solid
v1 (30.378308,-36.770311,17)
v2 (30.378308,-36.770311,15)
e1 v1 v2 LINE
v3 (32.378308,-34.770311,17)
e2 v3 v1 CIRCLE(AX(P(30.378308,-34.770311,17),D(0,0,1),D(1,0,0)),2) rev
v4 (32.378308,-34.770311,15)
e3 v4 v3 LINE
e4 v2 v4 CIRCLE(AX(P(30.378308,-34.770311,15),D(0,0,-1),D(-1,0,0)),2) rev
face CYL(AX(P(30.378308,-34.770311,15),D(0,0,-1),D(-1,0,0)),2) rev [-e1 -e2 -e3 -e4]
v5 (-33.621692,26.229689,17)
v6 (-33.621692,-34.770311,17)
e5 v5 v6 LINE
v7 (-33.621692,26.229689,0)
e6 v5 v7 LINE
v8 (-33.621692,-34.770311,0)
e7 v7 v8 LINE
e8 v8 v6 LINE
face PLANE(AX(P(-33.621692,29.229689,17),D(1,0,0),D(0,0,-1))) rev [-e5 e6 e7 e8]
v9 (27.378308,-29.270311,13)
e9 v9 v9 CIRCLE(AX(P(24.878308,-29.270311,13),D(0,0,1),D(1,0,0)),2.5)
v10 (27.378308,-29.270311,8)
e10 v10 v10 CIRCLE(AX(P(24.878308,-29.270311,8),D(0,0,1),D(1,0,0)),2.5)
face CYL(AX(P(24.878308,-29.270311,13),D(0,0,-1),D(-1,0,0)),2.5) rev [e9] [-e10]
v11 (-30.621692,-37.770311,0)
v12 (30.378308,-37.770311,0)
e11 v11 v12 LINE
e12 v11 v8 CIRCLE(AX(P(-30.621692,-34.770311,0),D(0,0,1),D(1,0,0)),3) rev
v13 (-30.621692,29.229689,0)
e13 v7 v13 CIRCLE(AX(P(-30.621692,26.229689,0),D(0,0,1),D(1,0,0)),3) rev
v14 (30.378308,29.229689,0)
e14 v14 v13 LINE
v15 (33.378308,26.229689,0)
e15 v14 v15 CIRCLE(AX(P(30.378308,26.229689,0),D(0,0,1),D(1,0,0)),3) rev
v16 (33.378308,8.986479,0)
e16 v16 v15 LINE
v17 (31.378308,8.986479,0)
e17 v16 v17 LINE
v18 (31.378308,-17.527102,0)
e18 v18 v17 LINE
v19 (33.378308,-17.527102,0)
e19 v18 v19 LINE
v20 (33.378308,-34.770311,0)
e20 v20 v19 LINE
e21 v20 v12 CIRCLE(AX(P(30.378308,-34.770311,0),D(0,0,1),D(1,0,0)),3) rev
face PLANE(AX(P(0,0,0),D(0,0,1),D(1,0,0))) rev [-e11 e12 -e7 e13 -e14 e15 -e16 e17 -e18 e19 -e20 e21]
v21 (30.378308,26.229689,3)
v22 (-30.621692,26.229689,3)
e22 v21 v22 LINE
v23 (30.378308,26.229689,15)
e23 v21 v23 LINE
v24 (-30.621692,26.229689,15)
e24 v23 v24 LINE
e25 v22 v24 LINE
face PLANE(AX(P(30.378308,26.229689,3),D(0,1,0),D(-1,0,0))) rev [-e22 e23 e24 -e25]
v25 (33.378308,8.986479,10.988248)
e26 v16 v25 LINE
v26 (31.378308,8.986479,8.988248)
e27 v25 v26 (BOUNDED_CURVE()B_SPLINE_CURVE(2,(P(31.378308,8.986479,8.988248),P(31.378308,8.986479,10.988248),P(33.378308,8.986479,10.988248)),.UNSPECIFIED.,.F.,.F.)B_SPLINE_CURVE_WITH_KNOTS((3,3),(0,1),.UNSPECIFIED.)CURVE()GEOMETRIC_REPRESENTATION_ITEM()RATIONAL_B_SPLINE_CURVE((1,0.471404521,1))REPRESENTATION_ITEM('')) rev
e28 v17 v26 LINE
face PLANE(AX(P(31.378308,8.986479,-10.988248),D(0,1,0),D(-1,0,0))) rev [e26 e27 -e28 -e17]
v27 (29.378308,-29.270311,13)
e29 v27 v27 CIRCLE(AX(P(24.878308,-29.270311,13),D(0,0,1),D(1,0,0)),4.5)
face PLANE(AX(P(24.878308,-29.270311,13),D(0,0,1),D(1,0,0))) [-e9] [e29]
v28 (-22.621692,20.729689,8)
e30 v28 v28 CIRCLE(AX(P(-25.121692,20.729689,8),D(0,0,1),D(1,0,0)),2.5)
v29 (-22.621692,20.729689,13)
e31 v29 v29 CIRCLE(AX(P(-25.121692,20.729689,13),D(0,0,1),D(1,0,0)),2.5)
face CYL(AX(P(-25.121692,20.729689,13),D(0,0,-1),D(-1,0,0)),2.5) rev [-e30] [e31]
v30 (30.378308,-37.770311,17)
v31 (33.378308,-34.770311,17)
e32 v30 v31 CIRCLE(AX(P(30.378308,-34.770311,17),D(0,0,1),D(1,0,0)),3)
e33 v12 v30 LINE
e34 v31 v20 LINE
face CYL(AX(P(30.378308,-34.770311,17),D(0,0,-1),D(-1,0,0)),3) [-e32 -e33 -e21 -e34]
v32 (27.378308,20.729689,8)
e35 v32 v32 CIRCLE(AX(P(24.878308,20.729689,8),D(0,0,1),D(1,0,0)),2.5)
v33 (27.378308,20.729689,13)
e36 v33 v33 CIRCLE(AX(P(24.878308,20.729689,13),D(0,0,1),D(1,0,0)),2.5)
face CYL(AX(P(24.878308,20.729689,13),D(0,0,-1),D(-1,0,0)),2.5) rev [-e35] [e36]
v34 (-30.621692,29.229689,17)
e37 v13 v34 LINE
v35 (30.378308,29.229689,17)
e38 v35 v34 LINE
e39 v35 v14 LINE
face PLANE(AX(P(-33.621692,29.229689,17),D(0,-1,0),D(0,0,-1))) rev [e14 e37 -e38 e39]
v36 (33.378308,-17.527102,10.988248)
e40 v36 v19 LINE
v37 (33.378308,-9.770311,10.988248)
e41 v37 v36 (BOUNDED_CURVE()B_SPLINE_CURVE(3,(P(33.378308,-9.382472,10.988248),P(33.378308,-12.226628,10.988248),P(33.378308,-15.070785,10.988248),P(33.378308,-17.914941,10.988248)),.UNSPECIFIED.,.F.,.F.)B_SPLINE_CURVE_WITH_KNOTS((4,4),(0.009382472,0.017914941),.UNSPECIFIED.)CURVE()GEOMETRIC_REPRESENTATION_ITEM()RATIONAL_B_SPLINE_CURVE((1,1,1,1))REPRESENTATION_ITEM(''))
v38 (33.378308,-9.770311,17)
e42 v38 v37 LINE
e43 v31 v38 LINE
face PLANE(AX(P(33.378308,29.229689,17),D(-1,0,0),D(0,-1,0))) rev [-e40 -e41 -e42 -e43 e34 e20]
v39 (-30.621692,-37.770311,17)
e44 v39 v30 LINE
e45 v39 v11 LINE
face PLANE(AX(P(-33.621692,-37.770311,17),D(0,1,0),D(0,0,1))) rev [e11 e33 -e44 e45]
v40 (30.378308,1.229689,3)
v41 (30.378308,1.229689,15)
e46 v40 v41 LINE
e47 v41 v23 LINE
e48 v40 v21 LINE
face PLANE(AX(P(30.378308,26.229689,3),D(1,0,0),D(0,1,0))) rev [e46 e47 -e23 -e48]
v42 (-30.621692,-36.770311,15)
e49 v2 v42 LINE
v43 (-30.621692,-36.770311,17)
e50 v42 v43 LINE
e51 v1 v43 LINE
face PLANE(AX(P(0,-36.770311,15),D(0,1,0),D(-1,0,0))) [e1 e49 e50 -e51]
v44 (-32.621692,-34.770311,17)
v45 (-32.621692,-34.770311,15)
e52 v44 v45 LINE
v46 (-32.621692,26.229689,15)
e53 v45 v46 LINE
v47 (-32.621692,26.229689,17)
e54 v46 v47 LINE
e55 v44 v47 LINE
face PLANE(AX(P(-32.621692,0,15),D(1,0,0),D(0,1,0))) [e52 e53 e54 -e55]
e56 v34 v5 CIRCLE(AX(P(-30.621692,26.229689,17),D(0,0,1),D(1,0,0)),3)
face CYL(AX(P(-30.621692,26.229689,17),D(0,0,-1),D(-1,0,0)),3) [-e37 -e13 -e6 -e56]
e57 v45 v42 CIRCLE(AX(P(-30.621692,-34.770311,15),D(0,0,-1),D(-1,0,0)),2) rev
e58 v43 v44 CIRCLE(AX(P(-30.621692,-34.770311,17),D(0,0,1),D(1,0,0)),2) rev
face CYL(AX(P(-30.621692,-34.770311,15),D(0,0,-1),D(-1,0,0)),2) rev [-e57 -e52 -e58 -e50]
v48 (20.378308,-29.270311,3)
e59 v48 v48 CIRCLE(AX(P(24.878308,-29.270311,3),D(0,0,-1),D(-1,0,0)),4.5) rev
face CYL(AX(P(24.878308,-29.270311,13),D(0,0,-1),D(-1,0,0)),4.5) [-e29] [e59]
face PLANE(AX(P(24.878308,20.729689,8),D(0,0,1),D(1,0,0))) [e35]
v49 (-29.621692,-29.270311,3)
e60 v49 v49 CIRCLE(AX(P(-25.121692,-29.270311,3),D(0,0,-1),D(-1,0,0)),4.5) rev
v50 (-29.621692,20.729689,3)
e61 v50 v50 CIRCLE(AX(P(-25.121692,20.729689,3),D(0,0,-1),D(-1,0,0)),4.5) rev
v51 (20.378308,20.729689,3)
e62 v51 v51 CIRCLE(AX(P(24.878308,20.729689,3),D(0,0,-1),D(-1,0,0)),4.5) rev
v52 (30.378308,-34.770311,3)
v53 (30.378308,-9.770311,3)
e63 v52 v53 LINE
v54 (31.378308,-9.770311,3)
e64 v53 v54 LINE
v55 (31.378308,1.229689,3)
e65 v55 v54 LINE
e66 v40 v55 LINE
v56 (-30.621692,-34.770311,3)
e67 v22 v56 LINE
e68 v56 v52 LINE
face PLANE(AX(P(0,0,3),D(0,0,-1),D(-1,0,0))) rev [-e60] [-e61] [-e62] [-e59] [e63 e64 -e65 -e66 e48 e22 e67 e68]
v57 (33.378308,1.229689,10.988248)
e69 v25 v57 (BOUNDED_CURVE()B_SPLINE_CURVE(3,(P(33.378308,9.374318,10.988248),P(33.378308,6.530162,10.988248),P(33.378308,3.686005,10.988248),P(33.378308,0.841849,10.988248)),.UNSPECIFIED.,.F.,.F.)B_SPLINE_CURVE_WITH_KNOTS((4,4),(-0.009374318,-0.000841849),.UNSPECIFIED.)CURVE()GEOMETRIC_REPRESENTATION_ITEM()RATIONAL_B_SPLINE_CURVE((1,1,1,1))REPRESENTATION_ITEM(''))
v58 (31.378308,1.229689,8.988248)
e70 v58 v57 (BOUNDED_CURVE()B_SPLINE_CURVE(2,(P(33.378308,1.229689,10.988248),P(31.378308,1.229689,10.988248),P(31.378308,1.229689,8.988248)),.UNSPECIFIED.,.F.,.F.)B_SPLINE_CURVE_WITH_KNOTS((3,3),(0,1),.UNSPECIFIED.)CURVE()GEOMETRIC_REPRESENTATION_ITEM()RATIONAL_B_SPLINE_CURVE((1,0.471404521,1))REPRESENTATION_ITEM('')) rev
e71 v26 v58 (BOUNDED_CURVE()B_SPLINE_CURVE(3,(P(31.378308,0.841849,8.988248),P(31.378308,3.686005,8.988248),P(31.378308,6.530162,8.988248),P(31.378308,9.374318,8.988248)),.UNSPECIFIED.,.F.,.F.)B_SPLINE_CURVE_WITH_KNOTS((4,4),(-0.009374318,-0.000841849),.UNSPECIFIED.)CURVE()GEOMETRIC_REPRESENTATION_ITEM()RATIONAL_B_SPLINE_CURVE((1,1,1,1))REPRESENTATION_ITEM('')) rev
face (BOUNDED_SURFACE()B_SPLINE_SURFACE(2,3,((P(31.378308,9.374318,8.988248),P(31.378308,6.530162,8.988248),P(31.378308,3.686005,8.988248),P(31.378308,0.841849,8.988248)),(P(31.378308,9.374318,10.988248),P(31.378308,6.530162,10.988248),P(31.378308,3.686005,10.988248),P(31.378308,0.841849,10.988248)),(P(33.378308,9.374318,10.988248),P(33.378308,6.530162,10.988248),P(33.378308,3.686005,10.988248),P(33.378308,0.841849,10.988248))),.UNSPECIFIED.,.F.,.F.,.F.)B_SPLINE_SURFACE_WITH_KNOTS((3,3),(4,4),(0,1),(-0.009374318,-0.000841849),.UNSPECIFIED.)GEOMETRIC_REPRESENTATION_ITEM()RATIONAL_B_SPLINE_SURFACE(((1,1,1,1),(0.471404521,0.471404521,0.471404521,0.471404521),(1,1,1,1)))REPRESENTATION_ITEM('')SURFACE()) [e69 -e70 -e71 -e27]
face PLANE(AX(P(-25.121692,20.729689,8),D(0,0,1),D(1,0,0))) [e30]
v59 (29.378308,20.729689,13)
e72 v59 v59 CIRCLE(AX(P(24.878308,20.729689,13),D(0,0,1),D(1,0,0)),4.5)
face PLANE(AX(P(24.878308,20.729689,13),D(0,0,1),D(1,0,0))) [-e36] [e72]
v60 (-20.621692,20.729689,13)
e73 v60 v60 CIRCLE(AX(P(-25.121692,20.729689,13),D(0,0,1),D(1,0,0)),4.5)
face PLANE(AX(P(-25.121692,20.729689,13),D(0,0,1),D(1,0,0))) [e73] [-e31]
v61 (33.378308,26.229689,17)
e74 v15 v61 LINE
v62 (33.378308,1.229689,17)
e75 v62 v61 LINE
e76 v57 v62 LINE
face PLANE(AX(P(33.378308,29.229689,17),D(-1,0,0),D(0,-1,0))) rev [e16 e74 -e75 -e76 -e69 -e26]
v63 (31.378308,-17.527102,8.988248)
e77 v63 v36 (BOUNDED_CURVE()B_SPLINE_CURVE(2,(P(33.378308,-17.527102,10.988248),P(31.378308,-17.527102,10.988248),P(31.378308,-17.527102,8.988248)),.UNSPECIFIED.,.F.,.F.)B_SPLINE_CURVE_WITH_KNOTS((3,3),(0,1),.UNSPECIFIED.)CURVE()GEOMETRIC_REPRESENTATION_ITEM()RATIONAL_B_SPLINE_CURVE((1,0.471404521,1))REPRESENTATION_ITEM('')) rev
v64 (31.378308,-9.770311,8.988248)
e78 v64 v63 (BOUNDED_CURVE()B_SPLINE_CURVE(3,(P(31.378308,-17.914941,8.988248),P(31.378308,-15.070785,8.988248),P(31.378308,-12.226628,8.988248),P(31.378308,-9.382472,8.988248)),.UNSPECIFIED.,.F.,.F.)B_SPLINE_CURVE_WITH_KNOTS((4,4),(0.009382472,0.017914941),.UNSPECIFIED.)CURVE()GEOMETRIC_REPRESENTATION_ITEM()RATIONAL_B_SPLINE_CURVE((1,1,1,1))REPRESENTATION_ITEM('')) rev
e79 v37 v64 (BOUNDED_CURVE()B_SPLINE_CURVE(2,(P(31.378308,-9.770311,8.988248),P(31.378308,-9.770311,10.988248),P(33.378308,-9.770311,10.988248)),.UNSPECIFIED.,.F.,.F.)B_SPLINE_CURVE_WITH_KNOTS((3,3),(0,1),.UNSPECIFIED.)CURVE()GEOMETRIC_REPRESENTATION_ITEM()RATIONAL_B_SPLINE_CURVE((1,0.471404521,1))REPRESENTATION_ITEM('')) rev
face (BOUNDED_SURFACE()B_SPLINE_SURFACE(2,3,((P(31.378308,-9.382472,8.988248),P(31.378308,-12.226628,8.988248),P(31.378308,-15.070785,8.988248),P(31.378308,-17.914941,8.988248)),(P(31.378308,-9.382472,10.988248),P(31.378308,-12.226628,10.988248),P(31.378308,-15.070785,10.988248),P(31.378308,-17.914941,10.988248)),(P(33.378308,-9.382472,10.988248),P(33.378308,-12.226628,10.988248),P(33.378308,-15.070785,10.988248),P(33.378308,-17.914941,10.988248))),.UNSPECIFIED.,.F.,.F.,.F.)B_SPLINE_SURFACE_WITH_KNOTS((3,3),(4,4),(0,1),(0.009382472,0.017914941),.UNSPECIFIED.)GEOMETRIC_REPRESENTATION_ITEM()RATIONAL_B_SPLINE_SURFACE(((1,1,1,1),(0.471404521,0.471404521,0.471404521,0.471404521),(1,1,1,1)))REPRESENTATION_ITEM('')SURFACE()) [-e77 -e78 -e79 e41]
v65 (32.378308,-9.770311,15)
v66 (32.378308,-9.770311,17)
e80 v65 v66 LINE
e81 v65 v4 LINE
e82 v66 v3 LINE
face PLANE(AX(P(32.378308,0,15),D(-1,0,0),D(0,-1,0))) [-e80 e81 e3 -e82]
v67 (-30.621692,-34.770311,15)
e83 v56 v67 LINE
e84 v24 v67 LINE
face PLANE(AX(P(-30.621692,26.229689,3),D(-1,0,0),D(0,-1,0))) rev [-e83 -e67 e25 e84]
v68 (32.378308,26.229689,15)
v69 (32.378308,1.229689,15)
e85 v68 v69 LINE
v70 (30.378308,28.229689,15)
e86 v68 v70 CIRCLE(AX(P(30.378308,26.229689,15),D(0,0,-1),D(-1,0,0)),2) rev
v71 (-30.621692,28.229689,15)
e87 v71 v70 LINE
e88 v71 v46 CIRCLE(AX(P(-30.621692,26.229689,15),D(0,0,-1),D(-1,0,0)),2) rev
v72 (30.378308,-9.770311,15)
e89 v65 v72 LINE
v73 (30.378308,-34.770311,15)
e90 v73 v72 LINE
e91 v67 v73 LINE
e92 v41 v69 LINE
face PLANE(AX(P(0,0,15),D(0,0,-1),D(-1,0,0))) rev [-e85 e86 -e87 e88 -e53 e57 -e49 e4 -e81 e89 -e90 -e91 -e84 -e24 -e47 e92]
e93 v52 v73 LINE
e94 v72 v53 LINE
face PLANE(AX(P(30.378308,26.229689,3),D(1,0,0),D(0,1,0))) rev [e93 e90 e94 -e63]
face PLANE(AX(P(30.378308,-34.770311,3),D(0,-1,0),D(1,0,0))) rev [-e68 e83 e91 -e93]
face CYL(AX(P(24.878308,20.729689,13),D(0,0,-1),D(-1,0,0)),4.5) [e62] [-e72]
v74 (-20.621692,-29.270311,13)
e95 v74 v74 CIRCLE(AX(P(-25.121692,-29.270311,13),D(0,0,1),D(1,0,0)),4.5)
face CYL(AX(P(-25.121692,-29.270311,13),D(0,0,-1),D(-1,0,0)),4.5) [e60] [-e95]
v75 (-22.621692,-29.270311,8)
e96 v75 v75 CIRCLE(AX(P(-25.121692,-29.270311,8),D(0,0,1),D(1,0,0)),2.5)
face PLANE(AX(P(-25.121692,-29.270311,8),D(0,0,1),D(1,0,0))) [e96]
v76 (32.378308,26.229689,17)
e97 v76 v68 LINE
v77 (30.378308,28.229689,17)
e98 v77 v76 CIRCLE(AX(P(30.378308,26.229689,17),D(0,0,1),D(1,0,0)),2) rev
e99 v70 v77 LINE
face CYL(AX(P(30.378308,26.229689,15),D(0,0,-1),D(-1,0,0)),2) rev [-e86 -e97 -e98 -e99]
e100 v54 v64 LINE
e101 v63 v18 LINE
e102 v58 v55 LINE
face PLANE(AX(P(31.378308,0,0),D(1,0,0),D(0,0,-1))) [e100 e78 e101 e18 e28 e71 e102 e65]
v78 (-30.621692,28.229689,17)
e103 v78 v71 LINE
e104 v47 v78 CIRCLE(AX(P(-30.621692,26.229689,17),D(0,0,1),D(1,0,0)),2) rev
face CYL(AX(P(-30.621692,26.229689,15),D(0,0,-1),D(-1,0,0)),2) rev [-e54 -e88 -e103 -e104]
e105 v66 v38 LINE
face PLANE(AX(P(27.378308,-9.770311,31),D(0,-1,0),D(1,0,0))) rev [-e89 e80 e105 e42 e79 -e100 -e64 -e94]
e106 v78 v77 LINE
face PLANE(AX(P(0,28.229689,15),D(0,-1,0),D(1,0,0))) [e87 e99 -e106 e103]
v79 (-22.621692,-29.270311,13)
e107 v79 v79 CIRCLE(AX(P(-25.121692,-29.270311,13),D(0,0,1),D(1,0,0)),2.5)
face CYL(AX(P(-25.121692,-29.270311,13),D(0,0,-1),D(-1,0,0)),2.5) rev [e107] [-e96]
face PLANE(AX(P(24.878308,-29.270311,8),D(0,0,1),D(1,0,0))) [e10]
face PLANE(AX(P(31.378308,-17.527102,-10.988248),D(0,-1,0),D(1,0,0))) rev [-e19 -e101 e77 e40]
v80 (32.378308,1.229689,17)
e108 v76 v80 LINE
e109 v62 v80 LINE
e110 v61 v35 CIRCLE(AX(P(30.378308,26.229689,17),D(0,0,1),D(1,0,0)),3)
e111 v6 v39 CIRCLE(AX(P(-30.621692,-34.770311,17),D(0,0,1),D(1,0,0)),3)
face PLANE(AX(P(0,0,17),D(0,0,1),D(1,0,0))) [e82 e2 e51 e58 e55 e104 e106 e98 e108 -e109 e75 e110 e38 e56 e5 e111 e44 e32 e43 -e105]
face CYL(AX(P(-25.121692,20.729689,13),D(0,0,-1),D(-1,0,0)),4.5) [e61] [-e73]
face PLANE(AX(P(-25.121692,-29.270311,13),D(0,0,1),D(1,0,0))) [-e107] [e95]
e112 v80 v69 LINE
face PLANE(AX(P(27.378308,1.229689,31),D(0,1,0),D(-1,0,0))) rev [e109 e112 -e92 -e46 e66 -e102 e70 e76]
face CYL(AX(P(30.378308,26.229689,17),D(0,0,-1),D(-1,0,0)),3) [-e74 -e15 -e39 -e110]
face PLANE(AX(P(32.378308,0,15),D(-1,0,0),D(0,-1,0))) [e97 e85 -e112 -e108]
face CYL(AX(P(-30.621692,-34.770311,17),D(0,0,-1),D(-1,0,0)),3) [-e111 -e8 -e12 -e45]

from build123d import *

# Parameters (mm, degrees)
SKETCH1_W           = 67
SKETCH1_H           = 67
BOSS_EXTRUDE1_DEPTH = 17
SKETCH2_W           = 61
SKETCH2_H           = 61
CUT_EXTRUDE1_DEPTH  = 14
CUT_EXTRUDE2_START  = 17
SKETCH3_W           = 65
SKETCH3_H           = 65
CUT_EXTRUDE2_DEPTH  = 2
FILLET1_R           = 3
FILLET3_R           = 2
FILLET4_R           = 2
FILLET5_R           = 2
FILLET6_R           = 2
FILLET7_R           = 3
FILLET8_R           = 3
FILLET9_R           = 3
SKETCH4_R           = 4.5
SKETCH4_R_2         = 2.5
BOSS_EXTRUDE2_DEPTH = 10
SKETCH5_R           = 2.5
BOSS_EXTRUDE3_DEPTH = 5
SKETCH6_W           = 28
SKETCH6_H           = 11
CUT_EXTRUDE3_DEPTH  = 6
SKETCH7_W           = 21.976496756
SKETCH7_H           = 26.513580245
CUT_EXTRUDE4_DEPTH  = 2
FILLET12_SIZE       = 2
FILLET13_SIZE       = 2


with BuildPart() as part:
    # Sketch1 → Boss-Extrude1 (new body)
    with BuildSketch(Plane.XY):
        with Locations((-0.121691543, -4.270311459)):
            Rectangle(SKETCH1_W, SKETCH1_H)
    extrude(amount=BOSS_EXTRUDE1_DEPTH)

    # Sketch2 → Cut-Extrude1 (cut)
    with BuildSketch(Plane.XY.offset(17)):
        with Locations((-0.121691543, -4.270311459)):
            Rectangle(SKETCH2_W, SKETCH2_H)
    extrude(amount=-CUT_EXTRUDE1_DEPTH, mode=Mode.SUBTRACT)

    # Sketch3 → Cut-Extrude2 (cut)
    with BuildSketch(Plane.XY.offset(CUT_EXTRUDE2_START)):
        with Locations((-0.121691543, -4.270311459)):
            Rectangle(SKETCH3_W, SKETCH3_H)
    extrude(amount=-CUT_EXTRUDE2_DEPTH, mode=Mode.SUBTRACT)

    # Fillet1
    fillet1_edges = [part.edges().sort_by_distance(p)[0] for p in [
        (-33.621691543, -37.770311459, 8.5),
    ]]
    fillet(fillet1_edges, radius=FILLET1_R)

    # Fillet3
    fillet3_edges = [part.edges().sort_by_distance(p)[0] for p in [
        (-32.621691543, -36.770311459, 16),
    ]]
    fillet(fillet3_edges, radius=FILLET3_R)

    # Fillet4
    fillet4_edges = [part.edges().sort_by_distance(p)[0] for p in [
        (-32.621691543, 28.229688541, 16),
    ]]
    fillet(fillet4_edges, radius=FILLET4_R)

    # Fillet5
    fillet5_edges = [part.edges().sort_by_distance(p)[0] for p in [
        (32.378308457, 28.229688541, 16),
    ]]
    fillet(fillet5_edges, radius=FILLET5_R)

    # Fillet6
    fillet6_edges = [part.edges().sort_by_distance(p)[0] for p in [
        (32.378308457, -36.770311459, 16),
    ]]
    fillet(fillet6_edges, radius=FILLET6_R)

    # Fillet7
    fillet7_edges = [part.edges().sort_by_distance(p)[0] for p in [
        (33.378308457, -37.770311459, 8.5),
    ]]
    fillet(fillet7_edges, radius=FILLET7_R)

    # Fillet8
    fillet8_edges = [part.edges().sort_by_distance(p)[0] for p in [
        (33.378308457, 29.229688541, 8.5),
    ]]
    fillet(fillet8_edges, radius=FILLET8_R)

    # Fillet9
    fillet9_edges = [part.edges().sort_by_distance(p)[0] for p in [
        (-33.621691543, 29.229688541, 8.5),
    ]]
    fillet(fillet9_edges, radius=FILLET9_R)

    # Sketch4 → Boss-Extrude2 (add)
    # profile 1 of 4: a face of its own
    with BuildSketch(Plane.XY.offset(3)):
        with Locations(Location((24.878308457, -29.270311459, 0), (0, 0, 180))):
            Circle(SKETCH4_R)
        with Locations((24.878308457, -29.270311459)):
            Circle(SKETCH4_R_2, mode=Mode.SUBTRACT)
    # profile 2 of 4: a face of its own
    with BuildSketch(Plane.XY.offset(3)):
        with Locations(Location((-25.121691543, -29.270311459, 0), (0, 0, 180))):
            Circle(SKETCH4_R)
        with Locations((-25.121691543, -29.270311459)):
            Circle(SKETCH4_R_2, mode=Mode.SUBTRACT)
    # profile 3 of 4: a face of its own
    with BuildSketch(Plane.XY.offset(3)):
        with Locations(Location((-25.121691543, 20.729688541, 0), (0, 0, 180))):
            Circle(SKETCH4_R)
        with Locations((-25.121691543, 20.729688541)):
            Circle(SKETCH4_R_2, mode=Mode.SUBTRACT)
    # profile 4 of 4: a face of its own
    with BuildSketch(Plane.XY.offset(3)):
        with Locations(Location((24.878308457, 20.729688541, 0), (0, 0, 180))):
            Circle(SKETCH4_R)
        with Locations((24.878308457, 20.729688541)):
            Circle(SKETCH4_R_2, mode=Mode.SUBTRACT)
    extrude(amount=BOSS_EXTRUDE2_DEPTH)

    # Sketch5 → Boss-Extrude3 (add)
    with BuildSketch(Plane.XY.offset(3)):
        with Locations((24.878308457, -29.270311459)):
            Circle(SKETCH5_R)
        with Locations((-25.121691543, -29.270311459)):
            Circle(SKETCH5_R)
        with Locations((-25.121691543, 20.729688541)):
            Circle(SKETCH5_R)
        with Locations((24.878308457, 20.729688541)):
            Circle(SKETCH5_R)
    extrude(amount=BOSS_EXTRUDE3_DEPTH)

    # Sketch6 → Cut-Extrude3 (cut)
    with BuildSketch(Plane(origin=(33.378308457, 0, 0), x_dir=(0, 0, -1), z_dir=(1, 0, 0))):
        with Locations((-17, -4.270311459)):
            Rectangle(SKETCH6_W, SKETCH6_H)
    extrude(amount=-CUT_EXTRUDE3_DEPTH, mode=Mode.SUBTRACT)

    # Sketch7 → Cut-Extrude4 (cut)
    with BuildSketch(Plane(origin=(33.378308457, 0, 0), x_dir=(0, 0, -1), z_dir=(1, 0, 0))):
        with Locations((0, -4.27031146)):
            Rectangle(SKETCH7_W, SKETCH7_H)
    extrude(amount=-CUT_EXTRUDE4_DEPTH, mode=Mode.SUBTRACT)

    # Fillet12
    # a fillet whose section is not a circle: 2 mm, written as the material it adds along each edge
    with BuildSketch(Plane(origin=(31.378308457, 1.229688541, 10.988248378), x_dir=(0, 0, -1), z_dir=(0, 1, 0))) as fillet12_piece_1:
        with BuildLine():
            Bezier((FILLET12_SIZE, 0), (0, 0), (0, -FILLET12_SIZE), weights=[1, 0.471404521, 1])
            Line((0, -FILLET12_SIZE), (0, 0))
            Line((0, 0), (FILLET12_SIZE, 0))
        make_face()
    extrude(amount=12.756790123)

    # Fillet13
    # a fillet whose section is not a circle: 2 mm, written as the material it adds along each edge
    with BuildSketch(Plane(origin=(31.378308457, -22.527101582, 10.988248378), x_dir=(0, 0, -1), z_dir=(0, 1, 0))) as fillet13_piece_1:
        with BuildLine():
            Bezier((FILLET13_SIZE, 0), (0, 0), (0, -FILLET13_SIZE), weights=[1, 0.471404521, 1])
            Line((0, -FILLET13_SIZE), (0, 0))
            Line((0, 0), (FILLET13_SIZE, 0))
        make_face()
    extrude(amount=12.756790123)


solid = part.part
